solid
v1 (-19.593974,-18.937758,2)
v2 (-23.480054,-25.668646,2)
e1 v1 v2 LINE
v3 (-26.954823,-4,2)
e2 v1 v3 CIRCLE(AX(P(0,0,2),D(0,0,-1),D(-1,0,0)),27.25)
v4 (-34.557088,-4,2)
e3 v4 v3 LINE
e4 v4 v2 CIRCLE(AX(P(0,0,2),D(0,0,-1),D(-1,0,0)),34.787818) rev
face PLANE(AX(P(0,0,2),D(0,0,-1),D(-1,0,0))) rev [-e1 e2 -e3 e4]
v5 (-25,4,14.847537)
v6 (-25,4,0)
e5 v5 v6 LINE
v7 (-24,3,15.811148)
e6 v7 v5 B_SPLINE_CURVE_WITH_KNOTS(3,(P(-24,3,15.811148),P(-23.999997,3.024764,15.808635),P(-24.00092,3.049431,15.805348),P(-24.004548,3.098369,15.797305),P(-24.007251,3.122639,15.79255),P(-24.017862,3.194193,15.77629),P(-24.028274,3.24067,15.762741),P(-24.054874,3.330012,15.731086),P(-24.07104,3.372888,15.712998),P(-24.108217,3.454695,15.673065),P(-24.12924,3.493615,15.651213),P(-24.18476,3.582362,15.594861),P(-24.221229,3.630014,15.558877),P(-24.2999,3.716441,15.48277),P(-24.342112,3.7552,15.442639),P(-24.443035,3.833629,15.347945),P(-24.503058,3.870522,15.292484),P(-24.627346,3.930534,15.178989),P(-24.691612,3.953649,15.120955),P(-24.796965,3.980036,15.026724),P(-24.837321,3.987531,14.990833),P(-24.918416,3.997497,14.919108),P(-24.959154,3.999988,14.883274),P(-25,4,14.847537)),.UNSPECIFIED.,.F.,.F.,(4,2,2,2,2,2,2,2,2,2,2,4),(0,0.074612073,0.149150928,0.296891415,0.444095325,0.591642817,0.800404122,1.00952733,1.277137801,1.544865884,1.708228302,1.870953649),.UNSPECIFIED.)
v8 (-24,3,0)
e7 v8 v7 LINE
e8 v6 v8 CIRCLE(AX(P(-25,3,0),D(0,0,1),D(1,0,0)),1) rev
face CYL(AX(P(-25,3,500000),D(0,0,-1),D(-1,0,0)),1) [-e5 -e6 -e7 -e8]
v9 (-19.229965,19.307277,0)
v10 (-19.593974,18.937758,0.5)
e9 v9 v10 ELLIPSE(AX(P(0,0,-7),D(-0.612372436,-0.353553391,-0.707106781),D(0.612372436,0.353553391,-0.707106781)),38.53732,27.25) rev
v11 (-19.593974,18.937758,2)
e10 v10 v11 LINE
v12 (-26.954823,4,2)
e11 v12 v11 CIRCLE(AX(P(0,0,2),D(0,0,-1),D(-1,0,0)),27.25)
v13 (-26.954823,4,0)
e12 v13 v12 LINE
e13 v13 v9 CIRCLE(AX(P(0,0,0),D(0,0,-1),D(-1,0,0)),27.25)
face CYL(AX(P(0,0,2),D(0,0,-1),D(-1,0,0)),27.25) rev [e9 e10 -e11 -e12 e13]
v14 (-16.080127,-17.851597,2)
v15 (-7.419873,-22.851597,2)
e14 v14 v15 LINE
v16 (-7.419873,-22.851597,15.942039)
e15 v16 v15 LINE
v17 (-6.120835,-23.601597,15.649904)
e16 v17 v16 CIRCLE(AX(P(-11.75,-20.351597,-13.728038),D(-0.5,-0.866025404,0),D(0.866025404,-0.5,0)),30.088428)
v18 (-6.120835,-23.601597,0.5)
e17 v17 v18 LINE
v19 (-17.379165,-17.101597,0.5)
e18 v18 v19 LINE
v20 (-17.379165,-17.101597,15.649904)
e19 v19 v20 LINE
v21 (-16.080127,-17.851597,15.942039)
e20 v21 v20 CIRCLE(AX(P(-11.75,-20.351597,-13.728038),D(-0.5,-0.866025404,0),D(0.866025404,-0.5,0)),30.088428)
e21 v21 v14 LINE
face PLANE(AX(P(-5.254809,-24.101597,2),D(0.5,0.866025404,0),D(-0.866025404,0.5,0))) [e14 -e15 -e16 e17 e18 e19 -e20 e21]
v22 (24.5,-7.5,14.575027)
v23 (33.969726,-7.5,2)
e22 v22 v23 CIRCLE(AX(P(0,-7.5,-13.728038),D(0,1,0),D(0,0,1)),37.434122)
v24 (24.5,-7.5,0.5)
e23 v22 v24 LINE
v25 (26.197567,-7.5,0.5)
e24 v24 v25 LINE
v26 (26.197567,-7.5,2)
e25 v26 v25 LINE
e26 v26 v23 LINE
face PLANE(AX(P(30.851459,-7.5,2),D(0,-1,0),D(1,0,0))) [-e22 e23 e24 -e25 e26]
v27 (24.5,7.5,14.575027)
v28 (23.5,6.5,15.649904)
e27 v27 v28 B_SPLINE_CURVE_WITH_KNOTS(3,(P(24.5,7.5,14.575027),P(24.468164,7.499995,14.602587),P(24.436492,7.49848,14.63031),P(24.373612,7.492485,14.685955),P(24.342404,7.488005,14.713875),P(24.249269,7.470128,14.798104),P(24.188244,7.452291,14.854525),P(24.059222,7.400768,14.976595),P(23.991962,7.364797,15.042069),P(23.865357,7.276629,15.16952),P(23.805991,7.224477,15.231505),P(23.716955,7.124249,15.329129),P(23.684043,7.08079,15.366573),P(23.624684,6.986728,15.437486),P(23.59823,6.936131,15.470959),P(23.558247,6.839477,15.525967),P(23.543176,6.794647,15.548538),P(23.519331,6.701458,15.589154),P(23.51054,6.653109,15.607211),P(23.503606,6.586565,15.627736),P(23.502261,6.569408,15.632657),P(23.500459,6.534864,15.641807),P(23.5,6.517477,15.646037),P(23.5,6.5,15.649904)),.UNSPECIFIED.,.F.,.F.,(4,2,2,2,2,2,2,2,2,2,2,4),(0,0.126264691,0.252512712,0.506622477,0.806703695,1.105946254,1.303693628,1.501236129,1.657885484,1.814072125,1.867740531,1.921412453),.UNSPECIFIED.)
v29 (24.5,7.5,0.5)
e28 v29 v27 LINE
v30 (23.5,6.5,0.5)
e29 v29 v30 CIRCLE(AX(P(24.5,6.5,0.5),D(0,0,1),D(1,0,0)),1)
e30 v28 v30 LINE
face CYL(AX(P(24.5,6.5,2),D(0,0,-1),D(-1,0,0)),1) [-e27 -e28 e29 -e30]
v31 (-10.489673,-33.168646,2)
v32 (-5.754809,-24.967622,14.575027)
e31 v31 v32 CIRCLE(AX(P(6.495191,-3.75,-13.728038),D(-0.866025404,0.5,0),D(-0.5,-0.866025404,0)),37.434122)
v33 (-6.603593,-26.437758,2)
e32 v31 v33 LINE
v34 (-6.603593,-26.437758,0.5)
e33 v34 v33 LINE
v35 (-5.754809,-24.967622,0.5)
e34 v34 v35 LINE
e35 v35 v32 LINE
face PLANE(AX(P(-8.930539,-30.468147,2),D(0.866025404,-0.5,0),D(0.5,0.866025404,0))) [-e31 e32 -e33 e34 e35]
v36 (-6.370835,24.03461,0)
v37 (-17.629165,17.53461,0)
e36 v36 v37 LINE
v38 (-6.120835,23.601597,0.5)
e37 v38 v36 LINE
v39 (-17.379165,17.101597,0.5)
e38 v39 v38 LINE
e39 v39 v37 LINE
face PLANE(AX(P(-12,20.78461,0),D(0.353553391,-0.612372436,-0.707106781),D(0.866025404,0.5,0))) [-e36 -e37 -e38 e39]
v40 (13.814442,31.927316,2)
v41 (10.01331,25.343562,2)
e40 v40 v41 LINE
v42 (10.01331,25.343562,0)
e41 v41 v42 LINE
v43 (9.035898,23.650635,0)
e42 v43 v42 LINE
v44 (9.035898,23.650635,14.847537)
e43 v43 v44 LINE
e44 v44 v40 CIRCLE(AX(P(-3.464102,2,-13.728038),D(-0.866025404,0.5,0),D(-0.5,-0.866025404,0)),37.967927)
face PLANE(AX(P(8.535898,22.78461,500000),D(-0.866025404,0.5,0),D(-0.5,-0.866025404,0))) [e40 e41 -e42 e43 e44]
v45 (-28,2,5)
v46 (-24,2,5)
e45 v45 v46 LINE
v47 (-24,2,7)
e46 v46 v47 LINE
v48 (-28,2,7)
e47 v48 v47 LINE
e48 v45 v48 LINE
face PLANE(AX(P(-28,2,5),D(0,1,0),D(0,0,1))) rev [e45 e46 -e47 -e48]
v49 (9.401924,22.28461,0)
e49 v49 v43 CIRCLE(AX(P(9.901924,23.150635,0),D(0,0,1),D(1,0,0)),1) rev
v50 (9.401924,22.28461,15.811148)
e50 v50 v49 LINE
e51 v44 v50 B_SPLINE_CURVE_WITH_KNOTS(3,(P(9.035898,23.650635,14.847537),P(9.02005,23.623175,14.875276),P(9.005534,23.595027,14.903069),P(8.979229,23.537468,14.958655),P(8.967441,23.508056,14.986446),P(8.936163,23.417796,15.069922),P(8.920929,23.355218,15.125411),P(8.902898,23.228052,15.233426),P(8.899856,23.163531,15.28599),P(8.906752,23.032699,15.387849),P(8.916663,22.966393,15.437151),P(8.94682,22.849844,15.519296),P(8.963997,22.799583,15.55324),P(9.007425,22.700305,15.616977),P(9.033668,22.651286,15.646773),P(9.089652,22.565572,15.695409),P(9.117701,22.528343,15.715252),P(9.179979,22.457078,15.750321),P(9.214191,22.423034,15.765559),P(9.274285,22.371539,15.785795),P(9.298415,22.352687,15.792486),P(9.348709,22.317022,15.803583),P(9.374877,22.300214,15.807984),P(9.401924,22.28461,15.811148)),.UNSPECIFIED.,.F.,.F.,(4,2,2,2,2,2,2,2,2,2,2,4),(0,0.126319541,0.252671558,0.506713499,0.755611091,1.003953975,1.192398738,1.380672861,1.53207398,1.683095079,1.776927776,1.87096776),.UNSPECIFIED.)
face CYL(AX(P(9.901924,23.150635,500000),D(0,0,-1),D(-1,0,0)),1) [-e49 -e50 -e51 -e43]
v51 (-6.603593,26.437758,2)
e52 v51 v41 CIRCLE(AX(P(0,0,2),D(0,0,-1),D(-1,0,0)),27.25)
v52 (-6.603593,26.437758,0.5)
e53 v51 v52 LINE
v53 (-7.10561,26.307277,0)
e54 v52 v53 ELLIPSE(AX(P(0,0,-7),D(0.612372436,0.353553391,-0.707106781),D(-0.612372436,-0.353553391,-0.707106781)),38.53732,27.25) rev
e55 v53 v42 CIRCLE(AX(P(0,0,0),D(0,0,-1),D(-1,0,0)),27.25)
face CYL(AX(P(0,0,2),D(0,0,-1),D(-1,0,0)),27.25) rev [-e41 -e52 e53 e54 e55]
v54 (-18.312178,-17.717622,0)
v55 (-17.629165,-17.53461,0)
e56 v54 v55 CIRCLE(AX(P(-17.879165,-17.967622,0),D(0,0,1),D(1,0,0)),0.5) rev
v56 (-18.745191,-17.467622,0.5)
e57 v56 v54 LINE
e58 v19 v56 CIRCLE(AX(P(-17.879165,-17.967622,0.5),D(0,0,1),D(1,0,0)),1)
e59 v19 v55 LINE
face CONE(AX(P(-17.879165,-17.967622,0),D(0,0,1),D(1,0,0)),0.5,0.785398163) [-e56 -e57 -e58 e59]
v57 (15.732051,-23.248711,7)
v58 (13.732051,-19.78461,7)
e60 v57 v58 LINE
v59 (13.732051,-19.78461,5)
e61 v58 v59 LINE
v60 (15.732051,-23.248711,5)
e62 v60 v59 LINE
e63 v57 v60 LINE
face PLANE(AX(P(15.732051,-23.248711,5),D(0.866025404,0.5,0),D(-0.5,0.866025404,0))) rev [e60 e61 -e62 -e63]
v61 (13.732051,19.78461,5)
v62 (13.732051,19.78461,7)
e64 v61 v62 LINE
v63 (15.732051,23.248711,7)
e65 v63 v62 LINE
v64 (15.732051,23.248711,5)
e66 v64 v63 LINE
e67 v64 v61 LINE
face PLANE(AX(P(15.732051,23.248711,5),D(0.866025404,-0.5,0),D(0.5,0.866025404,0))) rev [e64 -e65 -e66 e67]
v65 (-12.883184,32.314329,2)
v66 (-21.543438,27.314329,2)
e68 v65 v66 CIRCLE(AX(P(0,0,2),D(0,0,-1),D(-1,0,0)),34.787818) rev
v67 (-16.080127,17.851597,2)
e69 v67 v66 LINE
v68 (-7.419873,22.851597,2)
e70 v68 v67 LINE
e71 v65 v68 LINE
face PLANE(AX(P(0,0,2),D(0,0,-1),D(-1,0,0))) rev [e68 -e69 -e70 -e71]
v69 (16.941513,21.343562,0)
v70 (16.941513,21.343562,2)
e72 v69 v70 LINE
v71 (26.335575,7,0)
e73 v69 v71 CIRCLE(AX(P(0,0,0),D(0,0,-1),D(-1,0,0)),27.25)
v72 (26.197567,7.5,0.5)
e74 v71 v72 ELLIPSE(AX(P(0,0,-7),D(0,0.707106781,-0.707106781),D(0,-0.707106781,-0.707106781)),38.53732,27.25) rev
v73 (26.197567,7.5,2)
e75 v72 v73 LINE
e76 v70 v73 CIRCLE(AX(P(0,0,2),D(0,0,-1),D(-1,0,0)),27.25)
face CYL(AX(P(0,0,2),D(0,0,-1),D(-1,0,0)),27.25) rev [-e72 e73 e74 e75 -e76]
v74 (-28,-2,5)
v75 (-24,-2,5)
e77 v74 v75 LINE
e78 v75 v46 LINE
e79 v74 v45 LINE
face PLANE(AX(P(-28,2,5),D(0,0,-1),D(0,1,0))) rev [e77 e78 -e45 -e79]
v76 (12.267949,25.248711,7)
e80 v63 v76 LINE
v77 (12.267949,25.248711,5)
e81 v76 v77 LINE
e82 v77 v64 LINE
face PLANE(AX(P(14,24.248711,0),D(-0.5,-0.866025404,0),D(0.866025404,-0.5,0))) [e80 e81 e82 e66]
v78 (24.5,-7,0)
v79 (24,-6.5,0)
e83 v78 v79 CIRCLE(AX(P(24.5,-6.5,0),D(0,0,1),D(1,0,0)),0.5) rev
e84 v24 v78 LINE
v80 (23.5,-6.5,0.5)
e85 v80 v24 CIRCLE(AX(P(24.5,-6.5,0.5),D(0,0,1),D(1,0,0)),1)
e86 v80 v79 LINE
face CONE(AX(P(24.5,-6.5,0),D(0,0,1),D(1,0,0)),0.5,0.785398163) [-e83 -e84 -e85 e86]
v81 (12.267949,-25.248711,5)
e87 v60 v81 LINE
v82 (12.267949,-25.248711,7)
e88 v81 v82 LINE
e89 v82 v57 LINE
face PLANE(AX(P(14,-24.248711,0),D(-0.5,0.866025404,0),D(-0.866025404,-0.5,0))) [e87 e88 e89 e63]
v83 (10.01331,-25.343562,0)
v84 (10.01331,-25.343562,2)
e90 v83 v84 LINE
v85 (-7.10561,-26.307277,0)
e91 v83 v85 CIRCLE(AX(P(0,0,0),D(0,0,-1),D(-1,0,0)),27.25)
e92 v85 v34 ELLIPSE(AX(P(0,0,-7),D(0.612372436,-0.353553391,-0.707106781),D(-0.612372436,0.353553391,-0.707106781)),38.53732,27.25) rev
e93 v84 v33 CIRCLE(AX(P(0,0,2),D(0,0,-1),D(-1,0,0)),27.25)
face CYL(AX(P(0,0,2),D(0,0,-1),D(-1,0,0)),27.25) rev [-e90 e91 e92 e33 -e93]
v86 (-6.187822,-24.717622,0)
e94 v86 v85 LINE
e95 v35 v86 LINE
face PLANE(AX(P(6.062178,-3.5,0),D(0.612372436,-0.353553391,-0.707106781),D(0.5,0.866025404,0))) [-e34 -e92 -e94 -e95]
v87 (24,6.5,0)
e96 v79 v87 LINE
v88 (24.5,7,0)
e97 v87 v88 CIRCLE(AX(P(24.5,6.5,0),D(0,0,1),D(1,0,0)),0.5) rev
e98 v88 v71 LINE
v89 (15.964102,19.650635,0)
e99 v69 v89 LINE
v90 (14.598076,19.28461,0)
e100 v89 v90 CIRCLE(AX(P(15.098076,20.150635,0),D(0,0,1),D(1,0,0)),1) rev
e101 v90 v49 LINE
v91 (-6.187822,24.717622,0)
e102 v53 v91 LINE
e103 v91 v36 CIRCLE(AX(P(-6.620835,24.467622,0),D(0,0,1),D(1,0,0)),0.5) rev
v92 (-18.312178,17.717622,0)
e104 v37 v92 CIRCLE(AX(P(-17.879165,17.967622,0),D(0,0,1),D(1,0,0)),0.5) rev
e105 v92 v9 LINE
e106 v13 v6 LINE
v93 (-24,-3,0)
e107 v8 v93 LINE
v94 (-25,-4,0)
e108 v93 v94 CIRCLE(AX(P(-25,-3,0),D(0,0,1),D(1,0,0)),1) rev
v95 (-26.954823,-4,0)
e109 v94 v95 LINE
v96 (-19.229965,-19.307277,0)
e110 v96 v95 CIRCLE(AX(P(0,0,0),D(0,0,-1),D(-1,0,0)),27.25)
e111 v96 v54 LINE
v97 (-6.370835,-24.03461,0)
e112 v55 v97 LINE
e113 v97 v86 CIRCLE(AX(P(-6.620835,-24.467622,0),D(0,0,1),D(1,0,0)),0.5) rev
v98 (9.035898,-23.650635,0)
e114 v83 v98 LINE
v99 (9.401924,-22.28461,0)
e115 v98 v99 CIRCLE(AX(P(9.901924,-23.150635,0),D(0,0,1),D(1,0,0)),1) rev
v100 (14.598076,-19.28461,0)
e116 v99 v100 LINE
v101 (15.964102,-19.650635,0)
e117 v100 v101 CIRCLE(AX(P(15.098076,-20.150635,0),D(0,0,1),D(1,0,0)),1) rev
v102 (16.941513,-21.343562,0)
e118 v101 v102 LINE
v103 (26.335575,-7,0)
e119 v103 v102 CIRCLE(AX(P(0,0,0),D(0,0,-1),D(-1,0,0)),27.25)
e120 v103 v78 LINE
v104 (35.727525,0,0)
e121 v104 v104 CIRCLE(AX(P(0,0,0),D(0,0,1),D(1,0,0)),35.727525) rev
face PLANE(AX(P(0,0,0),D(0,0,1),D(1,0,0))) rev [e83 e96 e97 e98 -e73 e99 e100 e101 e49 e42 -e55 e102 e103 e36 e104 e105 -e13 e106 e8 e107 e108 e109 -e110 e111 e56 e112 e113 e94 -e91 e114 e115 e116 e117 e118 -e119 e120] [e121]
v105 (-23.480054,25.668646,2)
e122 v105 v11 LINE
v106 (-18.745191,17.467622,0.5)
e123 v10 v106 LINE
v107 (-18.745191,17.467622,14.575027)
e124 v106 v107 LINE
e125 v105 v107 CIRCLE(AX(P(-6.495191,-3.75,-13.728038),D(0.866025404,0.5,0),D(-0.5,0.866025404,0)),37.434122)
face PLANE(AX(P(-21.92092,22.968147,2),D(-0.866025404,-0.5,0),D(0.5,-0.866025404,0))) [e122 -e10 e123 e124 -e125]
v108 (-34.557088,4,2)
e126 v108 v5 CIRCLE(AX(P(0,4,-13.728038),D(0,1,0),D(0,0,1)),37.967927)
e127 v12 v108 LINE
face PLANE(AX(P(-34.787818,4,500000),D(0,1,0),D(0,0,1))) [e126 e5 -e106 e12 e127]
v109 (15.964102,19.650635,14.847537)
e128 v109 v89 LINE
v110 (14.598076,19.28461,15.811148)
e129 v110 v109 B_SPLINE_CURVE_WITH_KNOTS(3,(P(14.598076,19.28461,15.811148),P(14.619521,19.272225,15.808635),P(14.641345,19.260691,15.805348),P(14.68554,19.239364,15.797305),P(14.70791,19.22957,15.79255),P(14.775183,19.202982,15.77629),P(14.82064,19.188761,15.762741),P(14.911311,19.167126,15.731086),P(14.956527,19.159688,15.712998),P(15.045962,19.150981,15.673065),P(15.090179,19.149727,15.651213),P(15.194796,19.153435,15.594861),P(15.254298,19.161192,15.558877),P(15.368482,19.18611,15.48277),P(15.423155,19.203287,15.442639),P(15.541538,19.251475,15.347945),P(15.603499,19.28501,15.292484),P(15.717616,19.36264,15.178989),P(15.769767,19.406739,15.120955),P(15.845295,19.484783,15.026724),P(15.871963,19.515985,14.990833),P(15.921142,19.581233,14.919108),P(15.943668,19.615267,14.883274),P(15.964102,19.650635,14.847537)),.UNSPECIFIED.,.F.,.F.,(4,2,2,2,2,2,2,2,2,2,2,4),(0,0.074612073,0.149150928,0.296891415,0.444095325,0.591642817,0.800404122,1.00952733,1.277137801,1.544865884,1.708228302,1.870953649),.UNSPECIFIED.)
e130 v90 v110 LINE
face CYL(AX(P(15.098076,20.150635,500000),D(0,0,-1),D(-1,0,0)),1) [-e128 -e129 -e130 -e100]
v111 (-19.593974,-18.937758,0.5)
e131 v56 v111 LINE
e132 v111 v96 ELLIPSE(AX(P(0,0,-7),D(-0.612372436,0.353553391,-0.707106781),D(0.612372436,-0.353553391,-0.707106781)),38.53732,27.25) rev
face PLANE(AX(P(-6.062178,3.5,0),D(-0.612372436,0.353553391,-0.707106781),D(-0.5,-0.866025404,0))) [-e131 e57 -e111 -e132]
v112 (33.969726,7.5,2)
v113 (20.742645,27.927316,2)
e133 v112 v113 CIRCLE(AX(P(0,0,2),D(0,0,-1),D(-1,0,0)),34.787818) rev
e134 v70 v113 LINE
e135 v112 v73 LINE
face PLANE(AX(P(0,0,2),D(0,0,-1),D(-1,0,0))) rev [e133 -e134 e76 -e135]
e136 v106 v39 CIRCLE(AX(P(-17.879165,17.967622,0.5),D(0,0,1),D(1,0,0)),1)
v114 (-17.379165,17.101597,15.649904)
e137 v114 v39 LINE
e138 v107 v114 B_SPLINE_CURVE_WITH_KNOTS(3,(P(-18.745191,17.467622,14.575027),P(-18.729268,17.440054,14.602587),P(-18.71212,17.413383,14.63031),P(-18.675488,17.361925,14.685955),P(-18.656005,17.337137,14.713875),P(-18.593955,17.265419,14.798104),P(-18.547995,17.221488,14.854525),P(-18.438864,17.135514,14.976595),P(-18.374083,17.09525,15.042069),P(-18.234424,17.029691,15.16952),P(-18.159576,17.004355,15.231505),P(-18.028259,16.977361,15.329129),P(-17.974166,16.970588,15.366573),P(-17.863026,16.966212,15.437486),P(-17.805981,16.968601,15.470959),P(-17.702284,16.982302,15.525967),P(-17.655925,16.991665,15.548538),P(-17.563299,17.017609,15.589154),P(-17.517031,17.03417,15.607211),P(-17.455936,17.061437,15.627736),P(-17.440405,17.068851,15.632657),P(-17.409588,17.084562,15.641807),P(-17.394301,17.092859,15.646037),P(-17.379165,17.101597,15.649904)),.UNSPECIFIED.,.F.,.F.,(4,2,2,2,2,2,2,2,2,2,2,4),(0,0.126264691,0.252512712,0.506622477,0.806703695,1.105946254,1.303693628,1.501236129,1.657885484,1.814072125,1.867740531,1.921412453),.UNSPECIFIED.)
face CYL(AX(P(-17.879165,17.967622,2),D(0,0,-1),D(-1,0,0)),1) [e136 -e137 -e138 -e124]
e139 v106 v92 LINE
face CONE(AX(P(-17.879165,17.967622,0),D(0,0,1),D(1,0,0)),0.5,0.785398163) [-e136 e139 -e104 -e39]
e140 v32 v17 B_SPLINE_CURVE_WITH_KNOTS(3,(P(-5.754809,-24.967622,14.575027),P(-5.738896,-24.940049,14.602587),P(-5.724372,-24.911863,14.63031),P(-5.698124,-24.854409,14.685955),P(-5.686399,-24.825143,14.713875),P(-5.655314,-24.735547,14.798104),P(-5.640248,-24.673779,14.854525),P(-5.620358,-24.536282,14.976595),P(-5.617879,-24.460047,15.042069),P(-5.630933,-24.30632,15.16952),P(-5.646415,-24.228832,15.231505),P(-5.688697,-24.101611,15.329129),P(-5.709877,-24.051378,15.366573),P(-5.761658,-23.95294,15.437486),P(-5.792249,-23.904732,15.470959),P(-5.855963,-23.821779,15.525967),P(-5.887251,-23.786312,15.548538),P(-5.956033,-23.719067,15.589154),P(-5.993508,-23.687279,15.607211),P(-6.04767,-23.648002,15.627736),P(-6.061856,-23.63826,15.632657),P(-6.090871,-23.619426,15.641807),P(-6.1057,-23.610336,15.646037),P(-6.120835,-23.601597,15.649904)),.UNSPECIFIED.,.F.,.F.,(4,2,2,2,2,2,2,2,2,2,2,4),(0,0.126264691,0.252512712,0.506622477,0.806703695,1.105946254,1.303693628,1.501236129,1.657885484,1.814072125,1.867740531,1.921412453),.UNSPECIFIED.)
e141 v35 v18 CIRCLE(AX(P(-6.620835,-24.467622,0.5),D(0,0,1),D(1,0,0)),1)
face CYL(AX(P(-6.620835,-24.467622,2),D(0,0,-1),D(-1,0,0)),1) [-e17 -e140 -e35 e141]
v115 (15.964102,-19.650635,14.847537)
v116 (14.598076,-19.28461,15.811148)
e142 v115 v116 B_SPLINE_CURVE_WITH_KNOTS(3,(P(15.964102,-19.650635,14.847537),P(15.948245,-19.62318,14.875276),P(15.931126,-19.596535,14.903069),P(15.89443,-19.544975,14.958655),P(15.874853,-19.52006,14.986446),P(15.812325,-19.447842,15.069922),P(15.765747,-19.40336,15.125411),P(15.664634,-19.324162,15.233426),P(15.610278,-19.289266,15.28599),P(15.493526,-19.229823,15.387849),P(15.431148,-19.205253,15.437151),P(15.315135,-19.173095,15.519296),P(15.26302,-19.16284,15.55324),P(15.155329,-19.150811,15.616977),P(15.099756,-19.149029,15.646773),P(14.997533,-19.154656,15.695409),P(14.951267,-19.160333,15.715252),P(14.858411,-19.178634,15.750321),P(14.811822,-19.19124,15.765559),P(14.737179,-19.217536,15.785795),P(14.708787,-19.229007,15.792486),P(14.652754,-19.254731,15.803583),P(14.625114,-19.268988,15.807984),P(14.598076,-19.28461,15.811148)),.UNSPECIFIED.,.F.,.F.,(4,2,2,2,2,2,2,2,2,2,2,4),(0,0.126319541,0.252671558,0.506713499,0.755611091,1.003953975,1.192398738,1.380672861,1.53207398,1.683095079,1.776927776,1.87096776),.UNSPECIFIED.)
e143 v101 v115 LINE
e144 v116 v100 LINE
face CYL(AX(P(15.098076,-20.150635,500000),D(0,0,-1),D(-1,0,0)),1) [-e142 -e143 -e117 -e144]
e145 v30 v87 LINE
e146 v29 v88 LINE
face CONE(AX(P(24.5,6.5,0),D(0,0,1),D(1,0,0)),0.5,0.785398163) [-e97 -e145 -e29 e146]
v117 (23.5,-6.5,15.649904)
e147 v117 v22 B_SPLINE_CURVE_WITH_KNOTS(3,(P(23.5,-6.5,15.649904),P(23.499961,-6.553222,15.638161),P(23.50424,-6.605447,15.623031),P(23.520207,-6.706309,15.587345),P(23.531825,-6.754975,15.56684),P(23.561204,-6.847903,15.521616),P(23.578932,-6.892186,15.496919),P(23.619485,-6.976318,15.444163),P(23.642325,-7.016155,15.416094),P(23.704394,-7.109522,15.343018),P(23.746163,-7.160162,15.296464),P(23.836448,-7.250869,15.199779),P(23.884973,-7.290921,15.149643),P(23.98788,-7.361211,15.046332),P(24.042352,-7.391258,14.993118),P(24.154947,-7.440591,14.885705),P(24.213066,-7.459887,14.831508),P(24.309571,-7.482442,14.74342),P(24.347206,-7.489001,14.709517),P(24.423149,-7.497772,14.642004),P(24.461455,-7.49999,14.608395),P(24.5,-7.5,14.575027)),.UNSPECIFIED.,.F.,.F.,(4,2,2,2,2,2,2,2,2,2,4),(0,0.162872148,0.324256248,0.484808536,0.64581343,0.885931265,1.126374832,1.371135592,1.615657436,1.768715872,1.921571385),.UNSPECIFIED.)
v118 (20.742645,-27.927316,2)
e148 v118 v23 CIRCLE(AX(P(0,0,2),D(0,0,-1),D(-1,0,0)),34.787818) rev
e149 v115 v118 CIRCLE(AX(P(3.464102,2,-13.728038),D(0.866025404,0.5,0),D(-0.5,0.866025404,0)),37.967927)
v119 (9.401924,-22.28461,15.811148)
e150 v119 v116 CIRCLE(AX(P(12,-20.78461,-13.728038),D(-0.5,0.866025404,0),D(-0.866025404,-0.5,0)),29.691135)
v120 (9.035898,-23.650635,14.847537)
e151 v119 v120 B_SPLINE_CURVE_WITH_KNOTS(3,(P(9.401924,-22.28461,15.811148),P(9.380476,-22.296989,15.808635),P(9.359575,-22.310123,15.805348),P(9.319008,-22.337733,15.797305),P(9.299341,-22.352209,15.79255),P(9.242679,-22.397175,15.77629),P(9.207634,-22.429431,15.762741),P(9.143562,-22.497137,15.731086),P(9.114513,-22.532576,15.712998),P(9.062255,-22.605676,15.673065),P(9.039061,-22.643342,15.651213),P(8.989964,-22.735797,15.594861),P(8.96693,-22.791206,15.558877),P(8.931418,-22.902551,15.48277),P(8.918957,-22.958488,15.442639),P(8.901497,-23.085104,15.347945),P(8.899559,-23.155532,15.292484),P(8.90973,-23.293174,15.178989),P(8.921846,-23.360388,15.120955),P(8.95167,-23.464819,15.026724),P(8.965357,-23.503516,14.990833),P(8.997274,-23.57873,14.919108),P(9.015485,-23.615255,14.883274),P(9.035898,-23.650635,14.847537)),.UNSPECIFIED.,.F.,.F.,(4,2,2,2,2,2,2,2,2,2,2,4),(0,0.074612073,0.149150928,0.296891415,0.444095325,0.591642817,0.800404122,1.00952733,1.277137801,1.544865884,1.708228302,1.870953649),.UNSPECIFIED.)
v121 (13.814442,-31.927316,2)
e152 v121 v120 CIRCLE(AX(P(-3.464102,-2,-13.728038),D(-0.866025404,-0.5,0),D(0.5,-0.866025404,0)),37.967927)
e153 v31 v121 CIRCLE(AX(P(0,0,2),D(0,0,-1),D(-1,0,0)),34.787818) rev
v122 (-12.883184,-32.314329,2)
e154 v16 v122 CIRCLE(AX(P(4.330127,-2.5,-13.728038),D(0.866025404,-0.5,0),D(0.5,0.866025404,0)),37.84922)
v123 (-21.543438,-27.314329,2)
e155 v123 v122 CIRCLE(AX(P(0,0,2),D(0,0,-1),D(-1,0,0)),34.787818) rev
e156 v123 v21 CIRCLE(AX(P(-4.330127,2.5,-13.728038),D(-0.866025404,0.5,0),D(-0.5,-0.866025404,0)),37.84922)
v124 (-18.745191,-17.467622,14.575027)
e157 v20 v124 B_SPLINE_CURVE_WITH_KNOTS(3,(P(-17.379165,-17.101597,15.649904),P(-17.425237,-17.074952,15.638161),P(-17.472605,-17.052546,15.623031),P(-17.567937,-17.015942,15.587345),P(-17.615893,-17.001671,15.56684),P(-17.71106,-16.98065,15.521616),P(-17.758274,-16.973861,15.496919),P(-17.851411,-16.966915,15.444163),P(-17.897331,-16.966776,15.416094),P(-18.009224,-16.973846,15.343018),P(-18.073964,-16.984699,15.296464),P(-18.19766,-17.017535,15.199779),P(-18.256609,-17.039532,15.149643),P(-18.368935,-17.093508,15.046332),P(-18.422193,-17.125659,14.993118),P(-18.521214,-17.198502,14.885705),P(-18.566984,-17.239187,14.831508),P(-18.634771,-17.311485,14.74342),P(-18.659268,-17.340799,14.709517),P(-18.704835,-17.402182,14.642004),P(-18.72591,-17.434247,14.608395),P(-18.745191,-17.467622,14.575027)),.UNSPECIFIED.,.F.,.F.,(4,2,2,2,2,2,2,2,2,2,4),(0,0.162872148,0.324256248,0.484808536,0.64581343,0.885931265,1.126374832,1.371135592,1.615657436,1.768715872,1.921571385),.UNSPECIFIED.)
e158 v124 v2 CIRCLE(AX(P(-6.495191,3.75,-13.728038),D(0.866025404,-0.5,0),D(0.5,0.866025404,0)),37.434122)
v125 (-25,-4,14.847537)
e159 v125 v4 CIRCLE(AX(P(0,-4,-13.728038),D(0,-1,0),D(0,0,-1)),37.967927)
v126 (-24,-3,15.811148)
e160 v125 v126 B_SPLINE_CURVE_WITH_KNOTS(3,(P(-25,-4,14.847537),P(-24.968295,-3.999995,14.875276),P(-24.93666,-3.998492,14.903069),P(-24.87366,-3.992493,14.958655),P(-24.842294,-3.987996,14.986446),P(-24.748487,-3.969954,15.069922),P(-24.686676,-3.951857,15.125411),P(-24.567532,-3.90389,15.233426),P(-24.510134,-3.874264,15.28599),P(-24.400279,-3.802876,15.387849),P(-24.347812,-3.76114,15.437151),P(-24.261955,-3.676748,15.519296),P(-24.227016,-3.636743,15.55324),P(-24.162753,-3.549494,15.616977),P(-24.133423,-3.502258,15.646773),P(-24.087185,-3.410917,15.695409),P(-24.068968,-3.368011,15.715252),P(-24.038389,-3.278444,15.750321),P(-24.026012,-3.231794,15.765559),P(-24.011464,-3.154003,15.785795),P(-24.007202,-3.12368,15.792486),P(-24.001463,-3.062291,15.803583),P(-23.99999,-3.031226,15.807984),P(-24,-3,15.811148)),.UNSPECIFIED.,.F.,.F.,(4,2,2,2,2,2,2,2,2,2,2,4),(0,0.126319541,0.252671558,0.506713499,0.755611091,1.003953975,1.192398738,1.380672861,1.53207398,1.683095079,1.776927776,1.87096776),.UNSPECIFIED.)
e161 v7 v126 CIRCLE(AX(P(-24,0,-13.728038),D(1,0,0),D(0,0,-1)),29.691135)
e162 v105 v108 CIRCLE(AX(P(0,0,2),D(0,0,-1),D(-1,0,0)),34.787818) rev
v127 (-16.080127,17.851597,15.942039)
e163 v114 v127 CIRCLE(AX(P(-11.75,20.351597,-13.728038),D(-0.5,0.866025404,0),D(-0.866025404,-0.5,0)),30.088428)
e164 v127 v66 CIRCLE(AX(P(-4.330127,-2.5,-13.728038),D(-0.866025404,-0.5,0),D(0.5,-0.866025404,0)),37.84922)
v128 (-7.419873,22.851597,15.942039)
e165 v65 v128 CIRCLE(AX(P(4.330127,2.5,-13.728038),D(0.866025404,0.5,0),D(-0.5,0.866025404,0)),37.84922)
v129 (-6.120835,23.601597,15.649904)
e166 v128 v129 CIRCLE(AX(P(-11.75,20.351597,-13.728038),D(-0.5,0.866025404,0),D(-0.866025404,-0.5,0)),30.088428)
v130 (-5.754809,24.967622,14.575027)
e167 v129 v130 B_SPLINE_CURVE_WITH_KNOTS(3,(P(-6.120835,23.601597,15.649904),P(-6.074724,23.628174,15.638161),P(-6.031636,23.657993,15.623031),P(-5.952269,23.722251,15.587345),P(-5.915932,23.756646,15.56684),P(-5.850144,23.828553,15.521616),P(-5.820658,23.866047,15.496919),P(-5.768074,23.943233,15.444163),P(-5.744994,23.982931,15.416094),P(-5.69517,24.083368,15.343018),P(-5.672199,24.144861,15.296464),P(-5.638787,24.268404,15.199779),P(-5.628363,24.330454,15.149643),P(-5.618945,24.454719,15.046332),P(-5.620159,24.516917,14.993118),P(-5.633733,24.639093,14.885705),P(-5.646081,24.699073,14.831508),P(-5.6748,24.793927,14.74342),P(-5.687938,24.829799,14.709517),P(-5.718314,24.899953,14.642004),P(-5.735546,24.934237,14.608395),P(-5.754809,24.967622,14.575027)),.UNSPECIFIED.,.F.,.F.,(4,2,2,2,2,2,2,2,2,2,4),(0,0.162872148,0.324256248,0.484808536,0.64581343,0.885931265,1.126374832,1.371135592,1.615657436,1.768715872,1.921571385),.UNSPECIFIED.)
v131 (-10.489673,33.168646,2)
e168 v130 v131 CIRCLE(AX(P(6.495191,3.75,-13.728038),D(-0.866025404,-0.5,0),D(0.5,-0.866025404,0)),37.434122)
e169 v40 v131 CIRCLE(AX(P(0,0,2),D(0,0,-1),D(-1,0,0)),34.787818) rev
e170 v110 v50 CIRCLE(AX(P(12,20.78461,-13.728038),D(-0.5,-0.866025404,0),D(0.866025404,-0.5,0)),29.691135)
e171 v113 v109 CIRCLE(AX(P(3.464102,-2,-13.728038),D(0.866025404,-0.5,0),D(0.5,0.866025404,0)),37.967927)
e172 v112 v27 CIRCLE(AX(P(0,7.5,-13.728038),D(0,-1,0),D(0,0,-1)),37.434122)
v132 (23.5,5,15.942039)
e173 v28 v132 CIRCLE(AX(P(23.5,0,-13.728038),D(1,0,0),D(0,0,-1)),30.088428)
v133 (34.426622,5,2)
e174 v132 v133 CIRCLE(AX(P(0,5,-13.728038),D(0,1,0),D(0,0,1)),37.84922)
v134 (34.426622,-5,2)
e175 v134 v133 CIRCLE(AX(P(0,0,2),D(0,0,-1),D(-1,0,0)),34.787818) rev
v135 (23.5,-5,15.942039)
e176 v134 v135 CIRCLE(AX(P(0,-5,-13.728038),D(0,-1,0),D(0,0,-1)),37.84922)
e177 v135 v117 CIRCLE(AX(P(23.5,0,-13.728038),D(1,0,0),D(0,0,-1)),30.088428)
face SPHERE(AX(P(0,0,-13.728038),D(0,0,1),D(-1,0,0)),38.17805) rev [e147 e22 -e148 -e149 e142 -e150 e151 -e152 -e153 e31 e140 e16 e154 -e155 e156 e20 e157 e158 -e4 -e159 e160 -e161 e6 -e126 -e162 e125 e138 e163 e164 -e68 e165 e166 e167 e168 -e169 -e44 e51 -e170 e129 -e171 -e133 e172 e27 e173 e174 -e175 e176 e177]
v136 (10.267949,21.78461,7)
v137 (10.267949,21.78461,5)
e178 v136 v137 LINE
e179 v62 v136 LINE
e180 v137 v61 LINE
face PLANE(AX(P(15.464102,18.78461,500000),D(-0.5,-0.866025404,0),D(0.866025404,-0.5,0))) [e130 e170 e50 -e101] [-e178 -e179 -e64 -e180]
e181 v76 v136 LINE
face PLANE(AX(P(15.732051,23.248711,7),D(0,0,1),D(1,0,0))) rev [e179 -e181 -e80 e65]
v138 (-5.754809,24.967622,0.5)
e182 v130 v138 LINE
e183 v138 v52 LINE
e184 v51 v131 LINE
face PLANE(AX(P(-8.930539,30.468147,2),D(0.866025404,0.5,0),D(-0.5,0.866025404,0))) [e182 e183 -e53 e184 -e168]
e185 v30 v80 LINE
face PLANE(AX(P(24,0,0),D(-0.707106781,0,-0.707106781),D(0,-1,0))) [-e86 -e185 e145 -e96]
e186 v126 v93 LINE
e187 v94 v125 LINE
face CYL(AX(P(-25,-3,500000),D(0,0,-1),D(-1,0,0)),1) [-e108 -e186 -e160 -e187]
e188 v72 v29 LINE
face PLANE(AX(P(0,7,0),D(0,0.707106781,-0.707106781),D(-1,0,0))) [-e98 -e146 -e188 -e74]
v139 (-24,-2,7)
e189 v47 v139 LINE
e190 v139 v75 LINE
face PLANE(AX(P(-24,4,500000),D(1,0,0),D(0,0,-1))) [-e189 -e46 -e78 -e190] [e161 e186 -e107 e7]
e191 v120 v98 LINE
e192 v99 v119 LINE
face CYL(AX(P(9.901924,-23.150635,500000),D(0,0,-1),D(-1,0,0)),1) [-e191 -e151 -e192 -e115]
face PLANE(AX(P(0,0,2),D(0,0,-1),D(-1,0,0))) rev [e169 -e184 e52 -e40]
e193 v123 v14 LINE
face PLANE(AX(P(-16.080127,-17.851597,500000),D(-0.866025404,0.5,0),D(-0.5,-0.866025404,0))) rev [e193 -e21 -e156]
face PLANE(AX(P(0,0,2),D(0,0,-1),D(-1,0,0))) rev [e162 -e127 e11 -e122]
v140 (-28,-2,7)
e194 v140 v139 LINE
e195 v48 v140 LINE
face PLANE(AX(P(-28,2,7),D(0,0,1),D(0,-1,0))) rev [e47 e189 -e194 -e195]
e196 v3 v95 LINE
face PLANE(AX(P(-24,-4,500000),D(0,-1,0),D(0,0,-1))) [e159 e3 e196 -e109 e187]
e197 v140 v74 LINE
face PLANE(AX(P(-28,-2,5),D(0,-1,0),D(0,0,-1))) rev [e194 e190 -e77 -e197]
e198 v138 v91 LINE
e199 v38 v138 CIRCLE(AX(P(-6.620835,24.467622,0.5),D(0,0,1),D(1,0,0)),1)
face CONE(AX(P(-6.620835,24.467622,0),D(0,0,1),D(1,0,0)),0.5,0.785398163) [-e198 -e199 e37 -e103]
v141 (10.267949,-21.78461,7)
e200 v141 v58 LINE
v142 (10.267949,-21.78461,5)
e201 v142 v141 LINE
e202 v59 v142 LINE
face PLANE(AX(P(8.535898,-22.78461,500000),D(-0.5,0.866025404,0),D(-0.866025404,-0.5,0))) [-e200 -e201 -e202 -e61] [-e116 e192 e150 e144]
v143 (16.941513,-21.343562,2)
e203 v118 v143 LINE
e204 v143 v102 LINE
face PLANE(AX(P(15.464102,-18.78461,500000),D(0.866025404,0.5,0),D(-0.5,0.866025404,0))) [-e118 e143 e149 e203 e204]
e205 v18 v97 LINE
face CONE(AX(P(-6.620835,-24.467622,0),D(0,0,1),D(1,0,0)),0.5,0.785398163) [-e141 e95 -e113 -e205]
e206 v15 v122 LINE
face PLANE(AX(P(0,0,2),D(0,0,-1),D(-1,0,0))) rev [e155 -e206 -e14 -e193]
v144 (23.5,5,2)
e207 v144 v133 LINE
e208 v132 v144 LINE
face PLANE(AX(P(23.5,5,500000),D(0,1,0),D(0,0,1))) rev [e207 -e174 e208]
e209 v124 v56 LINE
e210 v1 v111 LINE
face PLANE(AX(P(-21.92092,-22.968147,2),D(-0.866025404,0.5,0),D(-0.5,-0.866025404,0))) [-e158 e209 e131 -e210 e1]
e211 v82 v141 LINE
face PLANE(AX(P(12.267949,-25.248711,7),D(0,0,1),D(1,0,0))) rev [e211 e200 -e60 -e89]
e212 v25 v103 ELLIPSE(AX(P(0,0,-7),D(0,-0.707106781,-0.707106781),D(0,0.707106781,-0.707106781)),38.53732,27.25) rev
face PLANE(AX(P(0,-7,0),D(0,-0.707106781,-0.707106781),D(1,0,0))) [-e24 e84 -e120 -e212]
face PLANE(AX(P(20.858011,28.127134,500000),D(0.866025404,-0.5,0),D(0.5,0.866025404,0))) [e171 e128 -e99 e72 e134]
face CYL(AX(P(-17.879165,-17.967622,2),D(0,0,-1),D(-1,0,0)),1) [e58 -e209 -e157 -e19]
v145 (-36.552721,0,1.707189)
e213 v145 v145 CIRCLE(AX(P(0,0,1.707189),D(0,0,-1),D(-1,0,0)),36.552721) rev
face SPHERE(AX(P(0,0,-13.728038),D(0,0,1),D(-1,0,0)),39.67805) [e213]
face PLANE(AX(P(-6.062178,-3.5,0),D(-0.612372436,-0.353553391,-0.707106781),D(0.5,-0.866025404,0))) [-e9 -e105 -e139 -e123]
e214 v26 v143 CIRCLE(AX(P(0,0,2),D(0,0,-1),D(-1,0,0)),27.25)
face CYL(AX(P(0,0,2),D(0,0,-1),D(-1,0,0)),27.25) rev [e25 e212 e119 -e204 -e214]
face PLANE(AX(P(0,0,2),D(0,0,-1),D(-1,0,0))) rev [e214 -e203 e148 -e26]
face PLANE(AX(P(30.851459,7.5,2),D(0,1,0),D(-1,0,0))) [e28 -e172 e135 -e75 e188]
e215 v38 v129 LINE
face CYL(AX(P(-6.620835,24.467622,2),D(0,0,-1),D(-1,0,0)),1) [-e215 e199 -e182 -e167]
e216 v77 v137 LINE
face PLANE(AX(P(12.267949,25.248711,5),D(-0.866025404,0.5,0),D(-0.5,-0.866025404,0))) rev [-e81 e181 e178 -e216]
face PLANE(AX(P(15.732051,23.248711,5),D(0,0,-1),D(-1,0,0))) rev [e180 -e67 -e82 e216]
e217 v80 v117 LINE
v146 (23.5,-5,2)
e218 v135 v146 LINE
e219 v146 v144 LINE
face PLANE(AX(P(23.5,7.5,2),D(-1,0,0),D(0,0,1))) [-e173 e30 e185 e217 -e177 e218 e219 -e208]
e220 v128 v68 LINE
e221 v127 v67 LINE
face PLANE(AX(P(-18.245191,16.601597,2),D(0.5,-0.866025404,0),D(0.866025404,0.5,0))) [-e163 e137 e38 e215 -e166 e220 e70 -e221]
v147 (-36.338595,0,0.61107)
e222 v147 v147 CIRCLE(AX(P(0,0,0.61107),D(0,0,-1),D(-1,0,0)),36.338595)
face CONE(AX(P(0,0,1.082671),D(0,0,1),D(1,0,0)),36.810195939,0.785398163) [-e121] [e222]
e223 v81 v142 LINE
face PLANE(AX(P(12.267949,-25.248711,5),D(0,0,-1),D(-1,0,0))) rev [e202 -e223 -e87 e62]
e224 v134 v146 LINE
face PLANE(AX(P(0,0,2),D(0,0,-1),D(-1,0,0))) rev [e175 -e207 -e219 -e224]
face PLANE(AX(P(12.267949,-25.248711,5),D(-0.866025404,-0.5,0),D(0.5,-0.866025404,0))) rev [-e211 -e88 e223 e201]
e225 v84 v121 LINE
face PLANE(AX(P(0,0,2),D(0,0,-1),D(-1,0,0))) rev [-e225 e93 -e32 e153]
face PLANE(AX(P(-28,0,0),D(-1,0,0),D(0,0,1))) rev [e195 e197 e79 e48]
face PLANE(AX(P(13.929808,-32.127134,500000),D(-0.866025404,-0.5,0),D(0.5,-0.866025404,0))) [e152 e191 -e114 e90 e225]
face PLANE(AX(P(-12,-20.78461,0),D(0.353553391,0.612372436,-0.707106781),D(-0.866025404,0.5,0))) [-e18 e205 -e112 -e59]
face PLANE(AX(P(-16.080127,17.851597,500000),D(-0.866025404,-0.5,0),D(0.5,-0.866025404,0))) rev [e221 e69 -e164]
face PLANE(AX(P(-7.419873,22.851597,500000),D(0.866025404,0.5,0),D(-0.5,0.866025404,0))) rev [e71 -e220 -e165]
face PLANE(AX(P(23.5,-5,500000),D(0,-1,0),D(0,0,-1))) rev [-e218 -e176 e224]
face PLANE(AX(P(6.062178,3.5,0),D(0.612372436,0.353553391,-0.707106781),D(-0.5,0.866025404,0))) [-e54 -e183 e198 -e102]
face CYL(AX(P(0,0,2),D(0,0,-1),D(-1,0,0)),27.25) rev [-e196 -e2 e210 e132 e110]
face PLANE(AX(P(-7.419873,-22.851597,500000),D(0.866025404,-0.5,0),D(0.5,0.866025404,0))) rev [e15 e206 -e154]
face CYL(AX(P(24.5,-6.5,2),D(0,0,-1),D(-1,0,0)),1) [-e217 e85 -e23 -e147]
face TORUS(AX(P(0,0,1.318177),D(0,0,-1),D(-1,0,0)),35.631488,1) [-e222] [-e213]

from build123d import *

# Parameters (mm, degrees)
SKETCH1_R                = 31.75
BOSS_EXTRUDE1_DEPTH      = 13
FILLET1_R                = 5
SHELL1_T                 = -1.5
SKETCH9_R                = 35.624492326
SKETCH9_R_2              = 27.25
BOSS_EXTRUDE5_DEPTH      = 2
SKETCH2_W                = 7.351458637
SKETCH2_H                = 15
BOSS_EXTRUDE2_DEPTH      = 2
BOSS_EXTRUDE3_REACH      = 59.839
SKETCH4_W                = 10.926622009
SKETCH4_H                = 2.5
FILLET3_R                = 1
BOSS_EXTRUDE4_REACH      = 60.696
BOSS_EXTRUDE4_END_RADIUS = 38.178049598
SKETCH5_W                = 10.787818312
SKETCH5_H                = 8
SKETCH6_W                = 2
SKETCH6_H                = 4
CUT_EXTRUDE1_DEPTH       = 4
SKETCH7_W                = 4
SKETCH7_H                = 2
CUT_EXTRUDE2_DEPTH       = 4
SKETCH8_W                = 4
SKETCH8_H                = 2
CUT_EXTRUDE3_DEPTH       = 4
FILLET5_R                = 1
CHAMFER2_SIZE            = 1.5
FILLET7_R                = 1
CHAMFER3_SIZE            = 0.5


with BuildPart() as part:
    # Sketch1 → Boss-Extrude1 (new body)
    with BuildSketch(Plane.XY):
        with Locations(Location((0, 0, 0), (0, 0, 180))):
            Circle(SKETCH1_R)
    extrude(amount=BOSS_EXTRUDE1_DEPTH)

    # Fillet1
    fillet1_edges = [part.edges().sort_by_distance(p)[0] for p in [
        (31.75, 0, 13),
    ]]
    fillet(fillet1_edges, radius=FILLET1_R)

    # Sketch12 → Revolve3 (revolve)
    with BuildSketch(Plane(origin=(0, 0, 0), x_dir=(1, 0, 0), z_dir=(0, 1, 0)), mode=Mode.PRIVATE) as revolve3_sk:
        with BuildLine():
            Line((0, -25.950011953), (0, -11.6))
            Line((0, -11.6), (27.242806288, -11.6))
            Line((27.242806288, -11.6), (27.242806288, -11.107193712))
            ThreePointArc((27.242806288, -11.107193712), (29.439924032, -10.197117744), (30.35, -8))
            Line((30.35, -8), (30.35, 0))
            Line((30.35, 0), (37.227524794, 0))
            ThreePointArc((37.227524794, 0), (22.689709797, -18.822303202), (0, -25.950011953))
        make_face()
    revolve(revolve3_sk.sketch.rotate(Axis((0, 0, 27.247512551), (0, 0, -1)), 180), axis=Axis((0, 0, 27.247512551), (0, 0, -1)))

    # Shell1
    shell1_openings = [part.faces().sort_by_distance(p)[0] for p in [
        (0, 0, 0),
    ]]
    offset(amount=SHELL1_T, openings=shell1_openings, kind=Kind.INTERSECTION)

    # Sketch9 → Boss-Extrude5 (add)
    with BuildSketch(Plane(origin=(0, 0, 0), x_dir=(-1, 0, 0), z_dir=(0, 0, -1))):
        Circle(SKETCH9_R)
        Circle(SKETCH9_R_2, mode=Mode.SUBTRACT)
    extrude(amount=-BOSS_EXTRUDE5_DEPTH)

    # Sketch2 → Boss-Extrude2 (add)
    with BuildSketch(Plane(origin=(0, 0, 0), x_dir=(-1, 0, 0), z_dir=(0, 0, -1))):
        with Locations((-27.175729319, 0)):
            Rectangle(SKETCH2_W, SKETCH2_H)
        Polygon((8.93053879, 30.468146923), (5.254809472, 24.101596989), (18.245190528, 16.601596989), (21.920919847, 22.968146923), align=None)
        Polygon((21.920919847, -22.968146923), (18.245190528, -16.601596989), (5.254809472, -24.101596989), (8.93053879, -30.468146923), align=None)
    extrude(amount=-BOSS_EXTRUDE2_DEPTH)

    # Sketch4 → Boss-Extrude3 (add, up to next)
    with BuildSketch(Plane.XY.offset(2), mode=Mode.PRIVATE) as boss_extrude3_sk1:
        with Locations((28.963311004, 6.25)):
            Rectangle(SKETCH4_W, SKETCH4_H)
    boss_extrude3_tool1 = extrude(boss_extrude3_sk1.sketch, amount=BOSS_EXTRUDE3_REACH, mode=Mode.PRIVATE) - part.part
    # Sketch4 → Boss-Extrude3 (add, up to next)
    with BuildSketch(Plane.XY.offset(2), mode=Mode.PRIVATE) as boss_extrude3_sk2:
        with Locations((28.963311004, -6.25)):
            Rectangle(SKETCH4_W, SKETCH4_H)
    boss_extrude3_tool2 = extrude(boss_extrude3_sk2.sketch, amount=BOSS_EXTRUDE3_REACH, mode=Mode.PRIVATE) - part.part
    # Sketch4 → Boss-Extrude3 (add, up to next)
    with BuildSketch(Plane.XY.offset(2), mode=Mode.PRIVATE) as boss_extrude3_sk3:
        Polygon((-16.080127019, -17.851596989), (-21.543438023, -27.314329226), (-23.708501533, -26.064329226), (-18.245190528, -16.601596989), align=None)
    boss_extrude3_tool3 = extrude(boss_extrude3_sk3.sketch, amount=BOSS_EXTRUDE3_REACH, mode=Mode.PRIVATE) - part.part
    # Sketch4 → Boss-Extrude3 (add, up to next)
    with BuildSketch(Plane.XY.offset(2), mode=Mode.PRIVATE) as boss_extrude3_sk4:
        Polygon((-7.419872981, -22.851596989), (-12.883183985, -32.314329226), (-10.718120476, -33.564329226), (-5.254809472, -24.101596989), align=None)
    boss_extrude3_tool4 = extrude(boss_extrude3_sk4.sketch, amount=BOSS_EXTRUDE3_REACH, mode=Mode.PRIVATE) - part.part
    # Sketch4 → Boss-Extrude3 (add, up to next)
    with BuildSketch(Plane.XY.offset(2), mode=Mode.PRIVATE) as boss_extrude3_sk5:
        Polygon((-7.419872981, 22.851596989), (-12.883183985, 32.314329226), (-10.718120476, 33.564329226), (-5.254809472, 24.101596989), align=None)
    boss_extrude3_tool5 = extrude(boss_extrude3_sk5.sketch, amount=BOSS_EXTRUDE3_REACH, mode=Mode.PRIVATE) - part.part
    # Sketch4 → Boss-Extrude3 (add, up to next)
    with BuildSketch(Plane.XY.offset(2), mode=Mode.PRIVATE) as boss_extrude3_sk6:
        Polygon((-16.080127019, 17.851596989), (-21.543438023, 27.314329226), (-23.708501533, 26.064329226), (-18.245190528, 16.601596989), align=None)
    boss_extrude3_tool6 = extrude(boss_extrude3_sk6.sketch, amount=BOSS_EXTRUDE3_REACH, mode=Mode.PRIVATE) - part.part
    add(boss_extrude3_tool1.solids().sort_by_distance((28.963311, 6.25, 2))[0])
    add(boss_extrude3_tool2.solids().sort_by_distance((28.963311, -6.25, 2))[0])
    add(boss_extrude3_tool3.solids().sort_by_distance((-19.894314, -21.957963, 2))[0])
    add(boss_extrude3_tool4.solids().sort_by_distance((-9.068997, -28.207963, 2))[0])
    add(boss_extrude3_tool5.solids().sort_by_distance((-9.068997, 28.207963, 2))[0])
    add(boss_extrude3_tool6.solids().sort_by_distance((-19.894314, 21.957963, 2))[0])

    # Fillet3
    fillet3_edges = [part.edges().sort_by_distance(p)[0] for p in [
        (23.5, -7.5, 7.705328032),
        (23.5, 7.5, 7.705328032),
        (-5.254809472, 24.101596989, 7.705328032),
        (-18.245190528, 16.601596989, 7.705328032),
        (-18.245190528, -16.601596989, 7.705328032),
        (-5.254809472, -24.101596989, 7.705328032),
    ]]
    fillet(fillet3_edges, radius=FILLET3_R)

    # Boss-Extrude4: up to this sphere (the profile starts inside it)
    boss_extrude4_end = Location((0, 0, -13.728037644)) * Sphere(BOSS_EXTRUDE4_END_RADIUS, mode=Mode.PRIVATE)
    # Sketch5 → Boss-Extrude4 (add, up to the surface)
    with BuildSketch(Plane(origin=(0, 0, 0), x_dir=(-1, 0, 0), z_dir=(0, 0, -1)), mode=Mode.PRIVATE) as boss_extrude4_sk1:
        with Locations((29.393909156, 0)):
            Rectangle(SKETCH5_W, SKETCH5_H)
    boss_extrude4_tool1 = extrude(boss_extrude4_sk1.sketch, amount=-BOSS_EXTRUDE4_REACH, mode=Mode.PRIVATE) & boss_extrude4_end
    add(boss_extrude4_tool1.solids().sort_by_distance((-29.393909, 0, 0))[0])
    # Sketch5 → Boss-Extrude4 (add, up to the surface)
    with BuildSketch(Plane(origin=(0, 0, 0), x_dir=(-1, 0, 0), z_dir=(0, 0, -1)), mode=Mode.PRIVATE) as boss_extrude4_sk2:
        Polygon((-8.535898385, -22.784609691), (-15.464101615, -18.784609691), (-20.858010771, -28.127134401), (-13.929807541, -32.127134401), align=None)
    boss_extrude4_tool2 = extrude(boss_extrude4_sk2.sketch, amount=-BOSS_EXTRUDE4_REACH, mode=Mode.PRIVATE) & boss_extrude4_end
    add(boss_extrude4_tool2.solids().sort_by_distance((14.696955, -25.455872, 0))[0])
    # Sketch5 → Boss-Extrude4 (add, up to the surface)
    with BuildSketch(Plane(origin=(0, 0, 0), x_dir=(-1, 0, 0), z_dir=(0, 0, -1)), mode=Mode.PRIVATE) as boss_extrude4_sk3:
        Polygon((-15.464101615, 18.784609691), (-8.535898385, 22.784609691), (-13.929807541, 32.127134401), (-20.858010771, 28.127134401), align=None)
    boss_extrude4_tool3 = extrude(boss_extrude4_sk3.sketch, amount=-BOSS_EXTRUDE4_REACH, mode=Mode.PRIVATE) & boss_extrude4_end
    add(boss_extrude4_tool3.solids().sort_by_distance((14.696955, 25.455872, 0))[0])

    # Sketch6 → Cut-Extrude1 (cut)
    with BuildSketch(Plane(origin=(-24, 0, 0), x_dir=(0, 0, -1), z_dir=(1, 0, 0))):
        with Locations((-6, 0)):
            Rectangle(SKETCH6_W, SKETCH6_H)
    extrude(amount=-CUT_EXTRUDE1_DEPTH, mode=Mode.SUBTRACT)

    # Sketch7 → Cut-Extrude2 (cut)
    with BuildSketch(Plane(origin=(12, -20.784609691, 0), x_dir=(0.8660254037844365, 0.5000000000000039, 0), z_dir=(-0.5000000000000038, 0.8660254037844364, 0))):
        with Locations((0, -6)):
            Rectangle(SKETCH7_W, SKETCH7_H)
    extrude(amount=-CUT_EXTRUDE2_DEPTH, mode=Mode.SUBTRACT)

    # Sketch8 → Cut-Extrude3 (cut)
    with BuildSketch(Plane(origin=(12, 20.784609691, 0), x_dir=(0.8660254037844257, -0.5000000000000224, 0), z_dir=(-0.5000000000000224, -0.8660254037844258, 0))):
        with Locations((0, 6)):
            Rectangle(SKETCH8_W, SKETCH8_H)
    extrude(amount=-CUT_EXTRUDE3_DEPTH, mode=Mode.SUBTRACT)

    # Fillet5
    fillet5_edges = [part.edges().sort_by_distance(p)[0] for p in [
        (-24, -4, 7.846211216),
        (-24, 4, 7.846211216),
        (15.464101615, -18.784609691, 7.846211216),
        (8.535898385, -22.784609691, 7.846211216),
        (8.535898385, 22.784609691, 7.846211216),
        (15.464101615, 18.784609691, 7.846211216),
    ]]
    fillet(fillet5_edges, radius=FILLET5_R)

    # Chamfer2
    # the kernel refuses this chamfer: 1.5, 1.168019183 mm, written as the material it takes off along each edge
    with BuildSketch(Plane(origin=(0, 0, 0), x_dir=(-1, 0, 0), z_dir=(0, -1, 0))) as chamfer2_piece_1:
        with BuildLine():
            Line((37.227524794 - CHAMFER2_SIZE, 0), (36.810195939, -1.082671144))
            ThreePointArc((36.810195939, -1.082671144), (37.018444042, -0.554203797), (37.227524794, 0))
            Line((37.227524794, 0), (37.227524794 - CHAMFER2_SIZE, 0))
        make_face()
    revolve(axis=Axis((0, 0, 0), (0, 0, -1)), mode=Mode.SUBTRACT)

    # Fillet7
    fillet7_edges = [part.edges().sort_by_distance(p)[0] for p in [
        (36.810195939, 0, 1.082671144),
    ]]
    fillet(fillet7_edges, radius=FILLET7_R)

    # Chamfer3
    chamfer3_edges = [part.edges().sort_by_distance(p)[0] for p in [
        (-11.75, 20.351596989, 0),
        (-11.75, -20.351596989, 0),
        (-6.179201142, -25.702690328, 0),
        (23.5, 0, 0),
        (25.34878334, 7.5, 0),
        (-19.169582199, 18.202690328, 0),
        (-5.654909049, -24.208803348, 0),
        (-18.13798417, -17.001696566, 0),
        (23.792893219, -7.207106781, 0),
        (23.792893219, 7.207106781, 0),
        (-5.654909049, 24.208803348, 0),
        (-18.13798417, 17.001696566, 0),
        (25.34878334, -7.5, 0),
        (-6.179201142, 25.702690328, 0),
        (-19.169582199, -18.202690328, 0),
    ]]
    chamfer(chamfer3_edges, length=CHAMFER3_SIZE)


solid = part.part
